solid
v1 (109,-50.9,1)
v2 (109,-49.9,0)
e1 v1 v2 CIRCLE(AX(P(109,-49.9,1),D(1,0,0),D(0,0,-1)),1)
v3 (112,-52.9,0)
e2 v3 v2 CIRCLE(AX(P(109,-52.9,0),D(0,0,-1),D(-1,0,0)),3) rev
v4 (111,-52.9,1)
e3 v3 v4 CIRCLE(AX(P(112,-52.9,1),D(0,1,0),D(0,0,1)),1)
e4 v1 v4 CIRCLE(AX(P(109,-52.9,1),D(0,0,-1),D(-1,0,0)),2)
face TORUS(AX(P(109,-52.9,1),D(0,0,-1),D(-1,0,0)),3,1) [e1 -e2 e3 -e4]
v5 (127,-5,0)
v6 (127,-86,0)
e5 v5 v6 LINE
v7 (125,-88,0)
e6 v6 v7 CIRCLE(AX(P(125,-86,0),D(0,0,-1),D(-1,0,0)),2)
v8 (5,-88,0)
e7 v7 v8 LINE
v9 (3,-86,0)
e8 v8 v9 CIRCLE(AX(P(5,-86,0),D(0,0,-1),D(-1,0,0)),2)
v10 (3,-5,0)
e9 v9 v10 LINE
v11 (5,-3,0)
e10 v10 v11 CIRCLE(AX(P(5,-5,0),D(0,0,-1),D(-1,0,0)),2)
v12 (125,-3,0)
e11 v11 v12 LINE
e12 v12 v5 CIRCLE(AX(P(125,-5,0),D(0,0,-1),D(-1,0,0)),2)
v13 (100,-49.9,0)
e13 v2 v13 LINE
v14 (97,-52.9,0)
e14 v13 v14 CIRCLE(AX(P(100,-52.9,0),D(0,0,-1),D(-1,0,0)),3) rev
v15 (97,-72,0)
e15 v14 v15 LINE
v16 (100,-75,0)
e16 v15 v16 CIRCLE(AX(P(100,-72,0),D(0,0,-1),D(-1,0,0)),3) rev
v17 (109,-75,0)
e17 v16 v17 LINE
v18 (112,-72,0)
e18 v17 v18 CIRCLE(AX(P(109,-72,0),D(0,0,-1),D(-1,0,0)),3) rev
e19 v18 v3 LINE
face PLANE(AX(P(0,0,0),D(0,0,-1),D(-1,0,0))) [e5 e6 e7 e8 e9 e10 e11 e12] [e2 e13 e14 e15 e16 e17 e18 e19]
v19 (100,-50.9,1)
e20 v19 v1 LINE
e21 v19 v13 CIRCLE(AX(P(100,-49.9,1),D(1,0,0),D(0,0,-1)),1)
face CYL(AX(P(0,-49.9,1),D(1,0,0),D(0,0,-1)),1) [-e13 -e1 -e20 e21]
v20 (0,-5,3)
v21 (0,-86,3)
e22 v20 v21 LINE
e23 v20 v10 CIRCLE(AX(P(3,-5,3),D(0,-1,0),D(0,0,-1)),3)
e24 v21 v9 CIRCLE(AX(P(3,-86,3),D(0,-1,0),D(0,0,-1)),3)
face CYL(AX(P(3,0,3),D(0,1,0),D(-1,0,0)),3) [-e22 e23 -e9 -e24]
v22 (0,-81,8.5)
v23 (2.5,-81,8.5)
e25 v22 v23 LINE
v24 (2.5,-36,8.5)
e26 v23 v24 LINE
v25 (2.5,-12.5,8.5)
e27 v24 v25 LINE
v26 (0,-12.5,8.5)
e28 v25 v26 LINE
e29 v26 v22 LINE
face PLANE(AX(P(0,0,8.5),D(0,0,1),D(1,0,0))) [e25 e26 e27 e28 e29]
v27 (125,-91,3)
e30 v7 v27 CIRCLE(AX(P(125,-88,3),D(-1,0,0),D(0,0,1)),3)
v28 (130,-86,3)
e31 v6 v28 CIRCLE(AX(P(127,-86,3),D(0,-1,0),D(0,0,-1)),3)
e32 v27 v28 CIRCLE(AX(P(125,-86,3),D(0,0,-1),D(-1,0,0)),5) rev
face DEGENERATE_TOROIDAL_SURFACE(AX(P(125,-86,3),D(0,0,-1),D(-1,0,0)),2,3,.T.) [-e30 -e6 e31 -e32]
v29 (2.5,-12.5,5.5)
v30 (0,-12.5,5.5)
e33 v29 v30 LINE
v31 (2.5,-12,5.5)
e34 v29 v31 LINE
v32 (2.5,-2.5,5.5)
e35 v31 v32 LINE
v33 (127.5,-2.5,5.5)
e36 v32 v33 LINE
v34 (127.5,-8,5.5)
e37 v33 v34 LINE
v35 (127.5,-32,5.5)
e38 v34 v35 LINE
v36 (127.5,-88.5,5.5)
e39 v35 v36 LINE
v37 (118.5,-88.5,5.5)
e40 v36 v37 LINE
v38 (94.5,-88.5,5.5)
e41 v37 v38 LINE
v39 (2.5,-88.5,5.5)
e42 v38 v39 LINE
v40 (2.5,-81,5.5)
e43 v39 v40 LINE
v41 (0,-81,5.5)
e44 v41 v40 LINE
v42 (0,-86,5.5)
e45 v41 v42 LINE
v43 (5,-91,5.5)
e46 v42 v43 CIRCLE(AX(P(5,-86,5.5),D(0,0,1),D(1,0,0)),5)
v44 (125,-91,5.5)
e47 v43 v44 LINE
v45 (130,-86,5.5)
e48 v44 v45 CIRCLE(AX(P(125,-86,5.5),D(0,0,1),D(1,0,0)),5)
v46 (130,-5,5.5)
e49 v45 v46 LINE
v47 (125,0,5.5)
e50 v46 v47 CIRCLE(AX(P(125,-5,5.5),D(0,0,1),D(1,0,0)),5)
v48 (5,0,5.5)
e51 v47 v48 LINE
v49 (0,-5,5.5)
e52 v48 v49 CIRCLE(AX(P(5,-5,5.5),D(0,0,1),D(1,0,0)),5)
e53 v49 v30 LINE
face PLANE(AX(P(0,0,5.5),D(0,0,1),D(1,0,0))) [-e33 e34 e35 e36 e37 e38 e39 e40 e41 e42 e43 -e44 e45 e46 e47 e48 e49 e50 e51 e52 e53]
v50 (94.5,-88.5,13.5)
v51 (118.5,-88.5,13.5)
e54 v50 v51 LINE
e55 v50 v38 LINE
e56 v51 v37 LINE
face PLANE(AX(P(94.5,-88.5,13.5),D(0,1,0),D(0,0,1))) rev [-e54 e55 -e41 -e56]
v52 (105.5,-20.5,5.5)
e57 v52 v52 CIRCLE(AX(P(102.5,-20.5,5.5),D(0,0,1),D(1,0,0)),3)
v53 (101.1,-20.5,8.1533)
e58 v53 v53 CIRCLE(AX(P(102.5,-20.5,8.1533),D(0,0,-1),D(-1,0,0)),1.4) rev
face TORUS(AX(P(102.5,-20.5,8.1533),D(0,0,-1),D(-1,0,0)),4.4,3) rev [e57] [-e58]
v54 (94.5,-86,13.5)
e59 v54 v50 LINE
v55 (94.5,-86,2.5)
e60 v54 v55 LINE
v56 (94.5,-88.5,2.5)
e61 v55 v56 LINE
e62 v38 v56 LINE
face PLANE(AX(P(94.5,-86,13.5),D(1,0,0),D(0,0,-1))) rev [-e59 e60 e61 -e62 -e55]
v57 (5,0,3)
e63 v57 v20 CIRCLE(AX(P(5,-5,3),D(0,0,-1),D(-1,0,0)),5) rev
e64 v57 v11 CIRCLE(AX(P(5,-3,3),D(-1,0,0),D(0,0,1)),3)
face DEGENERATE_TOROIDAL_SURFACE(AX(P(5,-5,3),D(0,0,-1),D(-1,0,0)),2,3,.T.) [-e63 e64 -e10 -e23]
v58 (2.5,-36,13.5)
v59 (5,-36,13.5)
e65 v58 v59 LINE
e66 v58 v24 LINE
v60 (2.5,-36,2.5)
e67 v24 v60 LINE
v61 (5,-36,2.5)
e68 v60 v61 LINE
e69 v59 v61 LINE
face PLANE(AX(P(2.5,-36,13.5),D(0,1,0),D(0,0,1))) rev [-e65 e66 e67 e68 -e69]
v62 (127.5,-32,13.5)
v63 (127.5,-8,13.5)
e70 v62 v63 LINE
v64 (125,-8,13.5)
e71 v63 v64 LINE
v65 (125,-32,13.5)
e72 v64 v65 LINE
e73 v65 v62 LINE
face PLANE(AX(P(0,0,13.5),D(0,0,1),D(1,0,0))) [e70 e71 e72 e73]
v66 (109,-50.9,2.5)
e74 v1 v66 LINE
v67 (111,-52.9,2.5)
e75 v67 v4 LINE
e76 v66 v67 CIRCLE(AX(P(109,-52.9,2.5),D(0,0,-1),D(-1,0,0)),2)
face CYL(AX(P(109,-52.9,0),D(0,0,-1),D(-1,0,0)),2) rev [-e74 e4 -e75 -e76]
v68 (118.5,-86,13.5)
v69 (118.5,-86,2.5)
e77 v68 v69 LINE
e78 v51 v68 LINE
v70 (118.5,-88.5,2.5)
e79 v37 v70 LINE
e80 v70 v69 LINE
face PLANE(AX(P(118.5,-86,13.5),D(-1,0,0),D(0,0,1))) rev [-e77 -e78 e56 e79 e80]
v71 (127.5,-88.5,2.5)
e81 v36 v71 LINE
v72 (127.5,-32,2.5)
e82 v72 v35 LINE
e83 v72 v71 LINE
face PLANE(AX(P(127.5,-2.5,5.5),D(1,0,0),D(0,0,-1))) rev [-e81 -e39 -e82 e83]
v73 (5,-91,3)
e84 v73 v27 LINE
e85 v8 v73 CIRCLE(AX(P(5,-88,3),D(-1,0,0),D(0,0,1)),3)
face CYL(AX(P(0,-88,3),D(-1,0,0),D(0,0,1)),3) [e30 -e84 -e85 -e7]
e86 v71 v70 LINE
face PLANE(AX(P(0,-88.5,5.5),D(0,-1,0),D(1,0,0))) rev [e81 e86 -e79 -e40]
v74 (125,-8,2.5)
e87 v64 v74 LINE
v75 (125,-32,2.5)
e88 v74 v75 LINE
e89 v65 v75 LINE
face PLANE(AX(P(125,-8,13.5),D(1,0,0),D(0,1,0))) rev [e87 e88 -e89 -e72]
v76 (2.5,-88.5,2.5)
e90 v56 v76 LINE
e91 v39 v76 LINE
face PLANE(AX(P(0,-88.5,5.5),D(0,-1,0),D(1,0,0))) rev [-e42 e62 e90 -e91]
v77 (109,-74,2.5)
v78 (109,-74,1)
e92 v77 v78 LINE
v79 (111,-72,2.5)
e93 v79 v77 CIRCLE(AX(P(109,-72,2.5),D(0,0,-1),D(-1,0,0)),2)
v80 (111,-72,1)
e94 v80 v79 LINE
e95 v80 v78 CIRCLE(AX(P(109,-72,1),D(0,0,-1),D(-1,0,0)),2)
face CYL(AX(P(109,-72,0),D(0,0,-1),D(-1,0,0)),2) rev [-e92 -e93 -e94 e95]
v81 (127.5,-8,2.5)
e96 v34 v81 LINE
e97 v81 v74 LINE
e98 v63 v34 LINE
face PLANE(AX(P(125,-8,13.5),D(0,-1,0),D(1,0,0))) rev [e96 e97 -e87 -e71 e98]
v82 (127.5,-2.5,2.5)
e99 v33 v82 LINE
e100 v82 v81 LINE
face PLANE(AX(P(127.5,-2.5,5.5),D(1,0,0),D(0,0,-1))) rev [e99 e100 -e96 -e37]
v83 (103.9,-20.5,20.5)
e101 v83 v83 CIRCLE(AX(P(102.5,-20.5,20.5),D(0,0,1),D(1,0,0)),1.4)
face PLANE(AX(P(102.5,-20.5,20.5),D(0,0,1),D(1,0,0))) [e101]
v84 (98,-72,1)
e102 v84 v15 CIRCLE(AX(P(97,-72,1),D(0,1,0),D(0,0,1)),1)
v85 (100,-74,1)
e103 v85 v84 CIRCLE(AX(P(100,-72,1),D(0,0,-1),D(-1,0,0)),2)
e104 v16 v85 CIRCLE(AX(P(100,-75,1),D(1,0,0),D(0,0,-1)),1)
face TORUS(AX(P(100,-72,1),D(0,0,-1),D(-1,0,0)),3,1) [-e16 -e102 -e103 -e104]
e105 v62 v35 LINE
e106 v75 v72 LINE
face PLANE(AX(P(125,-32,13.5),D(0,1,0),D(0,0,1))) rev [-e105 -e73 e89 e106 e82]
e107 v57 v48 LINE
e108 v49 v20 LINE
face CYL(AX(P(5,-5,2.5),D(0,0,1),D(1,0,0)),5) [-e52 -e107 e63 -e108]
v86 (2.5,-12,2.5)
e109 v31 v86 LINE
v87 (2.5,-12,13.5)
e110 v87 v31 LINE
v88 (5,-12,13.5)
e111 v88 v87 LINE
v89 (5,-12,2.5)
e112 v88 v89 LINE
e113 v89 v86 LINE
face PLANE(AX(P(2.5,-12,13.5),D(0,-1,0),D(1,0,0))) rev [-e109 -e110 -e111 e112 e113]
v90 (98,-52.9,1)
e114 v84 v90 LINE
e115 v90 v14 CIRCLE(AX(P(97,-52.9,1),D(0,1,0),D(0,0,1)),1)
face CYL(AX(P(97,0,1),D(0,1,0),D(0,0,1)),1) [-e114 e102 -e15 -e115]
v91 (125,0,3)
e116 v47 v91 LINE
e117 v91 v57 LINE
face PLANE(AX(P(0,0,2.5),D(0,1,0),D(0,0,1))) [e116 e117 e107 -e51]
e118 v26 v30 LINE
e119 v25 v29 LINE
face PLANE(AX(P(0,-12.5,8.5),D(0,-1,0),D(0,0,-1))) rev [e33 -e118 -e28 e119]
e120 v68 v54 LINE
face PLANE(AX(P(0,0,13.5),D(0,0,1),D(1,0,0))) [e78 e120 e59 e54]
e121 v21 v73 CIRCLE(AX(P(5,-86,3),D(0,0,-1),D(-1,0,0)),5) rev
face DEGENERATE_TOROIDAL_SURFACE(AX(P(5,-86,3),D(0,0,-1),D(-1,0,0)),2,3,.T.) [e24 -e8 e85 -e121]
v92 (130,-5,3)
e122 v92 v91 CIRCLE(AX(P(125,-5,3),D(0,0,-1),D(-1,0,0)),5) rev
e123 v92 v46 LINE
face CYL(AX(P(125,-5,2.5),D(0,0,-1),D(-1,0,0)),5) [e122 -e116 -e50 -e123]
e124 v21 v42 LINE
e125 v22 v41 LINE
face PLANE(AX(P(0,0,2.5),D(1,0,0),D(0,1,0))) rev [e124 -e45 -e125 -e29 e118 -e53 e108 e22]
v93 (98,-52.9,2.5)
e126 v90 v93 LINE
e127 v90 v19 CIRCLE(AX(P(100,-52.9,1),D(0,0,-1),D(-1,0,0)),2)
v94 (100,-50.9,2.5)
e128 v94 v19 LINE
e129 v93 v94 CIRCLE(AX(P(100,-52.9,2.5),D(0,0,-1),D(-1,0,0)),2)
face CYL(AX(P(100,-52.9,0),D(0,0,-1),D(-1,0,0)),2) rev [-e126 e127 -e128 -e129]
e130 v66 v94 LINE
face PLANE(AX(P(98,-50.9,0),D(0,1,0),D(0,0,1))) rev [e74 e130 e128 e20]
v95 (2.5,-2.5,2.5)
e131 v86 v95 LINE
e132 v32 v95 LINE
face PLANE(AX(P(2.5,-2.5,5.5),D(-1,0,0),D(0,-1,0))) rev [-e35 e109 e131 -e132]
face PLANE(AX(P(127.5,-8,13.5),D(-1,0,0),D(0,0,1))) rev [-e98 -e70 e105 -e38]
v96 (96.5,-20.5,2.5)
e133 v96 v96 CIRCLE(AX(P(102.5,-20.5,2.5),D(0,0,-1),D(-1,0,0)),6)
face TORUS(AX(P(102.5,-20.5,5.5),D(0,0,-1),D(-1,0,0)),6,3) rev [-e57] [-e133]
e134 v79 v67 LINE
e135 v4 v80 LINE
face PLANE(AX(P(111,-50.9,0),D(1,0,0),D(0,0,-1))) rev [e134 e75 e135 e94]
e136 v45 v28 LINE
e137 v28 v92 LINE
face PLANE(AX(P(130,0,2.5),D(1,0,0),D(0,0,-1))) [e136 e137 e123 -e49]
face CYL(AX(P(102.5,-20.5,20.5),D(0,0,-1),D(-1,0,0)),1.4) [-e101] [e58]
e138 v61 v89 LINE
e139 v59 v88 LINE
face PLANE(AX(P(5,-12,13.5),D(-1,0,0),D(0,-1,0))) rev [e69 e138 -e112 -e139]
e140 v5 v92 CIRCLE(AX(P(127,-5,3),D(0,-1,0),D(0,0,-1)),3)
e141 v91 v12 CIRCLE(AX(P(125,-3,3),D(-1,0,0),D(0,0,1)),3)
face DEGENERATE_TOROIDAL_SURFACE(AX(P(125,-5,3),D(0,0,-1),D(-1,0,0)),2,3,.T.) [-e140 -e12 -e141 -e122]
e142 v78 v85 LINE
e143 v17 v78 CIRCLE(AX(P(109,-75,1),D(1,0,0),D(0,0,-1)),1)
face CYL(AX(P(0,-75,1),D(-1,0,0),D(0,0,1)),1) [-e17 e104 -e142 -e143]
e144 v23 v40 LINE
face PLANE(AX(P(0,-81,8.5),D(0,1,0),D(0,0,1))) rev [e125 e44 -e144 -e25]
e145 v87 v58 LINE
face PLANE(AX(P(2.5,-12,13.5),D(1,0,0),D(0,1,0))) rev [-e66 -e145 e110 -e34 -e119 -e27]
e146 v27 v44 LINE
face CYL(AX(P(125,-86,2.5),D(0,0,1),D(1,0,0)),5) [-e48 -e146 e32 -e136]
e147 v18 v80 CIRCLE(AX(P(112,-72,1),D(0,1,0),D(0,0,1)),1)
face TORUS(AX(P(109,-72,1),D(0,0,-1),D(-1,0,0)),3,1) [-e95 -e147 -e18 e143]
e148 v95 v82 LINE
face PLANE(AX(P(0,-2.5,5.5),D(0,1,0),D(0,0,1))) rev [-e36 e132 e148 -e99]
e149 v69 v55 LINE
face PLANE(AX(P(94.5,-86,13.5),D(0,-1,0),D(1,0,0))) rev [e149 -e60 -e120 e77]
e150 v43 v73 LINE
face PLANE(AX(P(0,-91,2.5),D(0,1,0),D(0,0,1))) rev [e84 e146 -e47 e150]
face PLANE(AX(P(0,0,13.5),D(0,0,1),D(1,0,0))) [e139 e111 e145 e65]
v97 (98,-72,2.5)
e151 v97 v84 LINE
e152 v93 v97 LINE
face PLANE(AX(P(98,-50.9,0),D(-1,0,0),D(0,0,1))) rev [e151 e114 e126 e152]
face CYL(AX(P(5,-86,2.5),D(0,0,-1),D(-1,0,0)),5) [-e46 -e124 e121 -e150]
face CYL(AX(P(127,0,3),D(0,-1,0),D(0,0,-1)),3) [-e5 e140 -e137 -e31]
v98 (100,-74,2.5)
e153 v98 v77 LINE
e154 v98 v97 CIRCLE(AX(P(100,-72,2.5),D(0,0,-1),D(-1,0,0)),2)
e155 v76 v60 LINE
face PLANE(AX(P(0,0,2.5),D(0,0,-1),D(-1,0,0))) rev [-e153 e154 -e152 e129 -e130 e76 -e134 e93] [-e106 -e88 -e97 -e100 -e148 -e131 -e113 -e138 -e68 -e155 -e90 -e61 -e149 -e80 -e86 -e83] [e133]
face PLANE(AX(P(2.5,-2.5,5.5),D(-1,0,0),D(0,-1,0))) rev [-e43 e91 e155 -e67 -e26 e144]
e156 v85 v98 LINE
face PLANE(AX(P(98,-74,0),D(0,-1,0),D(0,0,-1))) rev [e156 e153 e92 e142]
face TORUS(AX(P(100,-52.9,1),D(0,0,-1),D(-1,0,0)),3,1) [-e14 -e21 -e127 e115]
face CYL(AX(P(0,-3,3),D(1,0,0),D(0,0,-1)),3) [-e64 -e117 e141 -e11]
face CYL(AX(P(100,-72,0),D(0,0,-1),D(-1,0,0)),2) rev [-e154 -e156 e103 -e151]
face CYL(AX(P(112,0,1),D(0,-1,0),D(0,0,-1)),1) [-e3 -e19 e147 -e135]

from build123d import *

# Parameters (mm, degrees)
SKETCH1_W            = 130
SKETCH1_H            = 91
BOSS_EXTRUDE1_DEPTH  = 2.5
SKETCH3_W            = 130
SKETCH3_H            = 2.5
BOSS_EXTRUDE2_DEPTH  = 3
SKETCH2_W            = 130
SKETCH2_H            = 2.5
BOSS_EXTRUDE3_DEPTH  = 3
SKETCH4_W            = 2.5
SKETCH4_H            = 86
BOSS_EXTRUDE4_DEPTH  = 3
SKETCH5_W            = 2.5
SKETCH5_H            = 86
BOSS_EXTRUDE5_DEPTH  = 3
FILLET2_R            = 5
FILLET3_R            = 5
FILLET4_R            = 5
FILLET5_R            = 5
SKETCH7_W            = 2.5
SKETCH7_H            = 68.5
BOSS_EXTRUDE6_DEPTH  = 3
SKETCH8_W            = 24
SKETCH8_H            = 2.5
BOSS_EXTRUDE7_DEPTH  = 11
SKETCH9_W            = 2.5
SKETCH9_H            = 24
BOSS_EXTRUDE8_DEPTH  = 11
SKETCH10_W           = 2.5
SKETCH10_H           = 24
BOSS_EXTRUDE9_DEPTH  = 11
SKETCH11_R           = 3
BOSS_EXTRUDE10_DEPTH = 3
SKETCH12_R           = 1.4
BOSS_EXTRUDE11_DEPTH = 15
SKETCH13_W           = 13
SKETCH13_H           = 23.1
CUT_EXTRUDE1_DEPTH   = 160.702849067
FILLET17_R           = 2
FILLET18_R           = 2
FILLET19_R           = 2
FILLET20_R           = 2
FILLET23_R           = 1
FILLET24_R           = 3
FILLET25_R           = 3
FILLET26_R           = 3


# Some blends are built 0.0001 mm under size
with BuildPart() as part:
    # Sketch1 → Boss-Extrude1 (new body)
    with BuildSketch(Plane.XY):
        with Locations((65, -45.5)):
            Rectangle(SKETCH1_W, SKETCH1_H)
    extrude(amount=BOSS_EXTRUDE1_DEPTH)

    # Sketch3 → Boss-Extrude2 (add)
    with BuildSketch(Plane.XY.offset(2.5)):
        with Locations((65, -89.75)):
            Rectangle(SKETCH3_W, SKETCH3_H)
    extrude(amount=BOSS_EXTRUDE2_DEPTH)

    # Sketch2 → Boss-Extrude3 (add)
    with BuildSketch(Plane.XY.offset(2.5)):
        with Locations((65, -1.25)):
            Rectangle(SKETCH2_W, SKETCH2_H)
    extrude(amount=BOSS_EXTRUDE3_DEPTH)

    # Sketch4 → Boss-Extrude4 (add)
    with BuildSketch(Plane.XY.offset(2.5)):
        with Locations((128.75, -45.5)):
            Rectangle(SKETCH4_W, SKETCH4_H)
    extrude(amount=BOSS_EXTRUDE4_DEPTH)

    # Sketch5 → Boss-Extrude5 (add)
    with BuildSketch(Plane.XY.offset(2.5)):
        with Locations((1.25, -45.5)):
            Rectangle(SKETCH5_W, SKETCH5_H)
    extrude(amount=BOSS_EXTRUDE5_DEPTH)

    # Fillet2
    fillet2_edges = [part.edges().sort_by_distance(p)[0] for p in [
        (130, -91, 2.75),
    ]]
    fillet(fillet2_edges, radius=FILLET2_R)

    # Fillet3
    fillet3_edges = [part.edges().sort_by_distance(p)[0] for p in [
        (130, 0, 2.75),
    ]]
    fillet(fillet3_edges, radius=FILLET3_R)

    # Fillet4
    fillet4_edges = [part.edges().sort_by_distance(p)[0] for p in [
        (0, 0, 2.75),
    ]]
    fillet(fillet4_edges, radius=FILLET4_R)

    # Fillet5
    fillet5_edges = [part.edges().sort_by_distance(p)[0] for p in [
        (0, -91, 2.75),
    ]]
    fillet(fillet5_edges, radius=FILLET5_R)

    # Sketch7 → Boss-Extrude6 (add)
    with BuildSketch(Plane.XY.offset(5.5)):
        with Locations((1.25, -46.75)):
            Rectangle(SKETCH7_W, SKETCH7_H)
    extrude(amount=BOSS_EXTRUDE6_DEPTH)

    # Sketch8 → Boss-Extrude7 (add)
    with BuildSketch(Plane.XY.offset(2.5)):
        with Locations((106.5, -87.25)):
            Rectangle(SKETCH8_W, SKETCH8_H)
    extrude(amount=BOSS_EXTRUDE7_DEPTH)

    # Sketch9 → Boss-Extrude8 (add)
    with BuildSketch(Plane.XY.offset(2.5)):
        with Locations((126.25, -20)):
            Rectangle(SKETCH9_W, SKETCH9_H)
    extrude(amount=BOSS_EXTRUDE8_DEPTH)

    # Sketch10 → Boss-Extrude9 (add)
    with BuildSketch(Plane.XY.offset(2.5)):
        with Locations((3.75, -24)):
            Rectangle(SKETCH10_W, SKETCH10_H)
    extrude(amount=BOSS_EXTRUDE9_DEPTH)

    # Sketch11 → Boss-Extrude10 (add)
    with BuildSketch(Plane.XY.offset(2.5)):
        with Locations(Location((102.5, -20.5, 0), (0, 0, 180))):
            Circle(SKETCH11_R)
    extrude(amount=BOSS_EXTRUDE10_DEPTH)

    # Sketch12 → Boss-Extrude11 (add)
    with BuildSketch(Plane.XY.offset(5.5)):
        with Locations((102.5, -20.5)):
            Circle(SKETCH12_R)
    extrude(amount=BOSS_EXTRUDE11_DEPTH)

    # Sketch13 → Cut-Extrude1 (cut, through all)
    with BuildSketch(Plane.XY.offset(2.5)):
        with Locations((104.5, -62.45)):
            Rectangle(SKETCH13_W, SKETCH13_H)
    extrude(amount=-CUT_EXTRUDE1_DEPTH, mode=Mode.SUBTRACT)

    # Fillet17
    fillet17_edges = [part.edges().sort_by_distance(p)[0] for p in [
        (98, -74, 1.25),
    ]]
    fillet(fillet17_edges, radius=FILLET17_R)

    # Fillet18
    fillet18_edges = [part.edges().sort_by_distance(p)[0] for p in [
        (98, -50.9, 1.25),
    ]]
    fillet(fillet18_edges, radius=FILLET18_R)

    # Fillet19
    fillet19_edges = [part.edges().sort_by_distance(p)[0] for p in [
        (111, -50.9, 1.25),
    ]]
    fillet(fillet19_edges, radius=FILLET19_R)

    # Fillet20
    fillet20_edges = [part.edges().sort_by_distance(p)[0] for p in [
        (111, -74, 1.25),
    ]]
    fillet(fillet20_edges, radius=FILLET20_R)

    # Fillet23
    fillet23_edges = [part.edges().sort_by_distance(p)[0] for p in [
        (104.5, -74, 0),
        (98.585786438, -73.414213562, 0),
        (98, -62.45, 0),
        (98.585786438, -51.485786438, 0),
        (104.5, -50.9, 0),
        (110.414213562, -51.485786438, 0),
        (111, -62.45, 0),
        (110.414213562, -73.414213562, 0),
    ]]
    fillet(fillet23_edges, radius=FILLET23_R)

    # Fillet24
    fillet24_edges = [part.edges().sort_by_distance(p)[0] for p in [
        (128.535533906, -89.535533906, 0),
        (130, -45.5, 0),
        (128.535533906, -1.464466094, 0),
        (0, -45.5, 0),
        (65, 0, 0),
        (1.464466094, -1.464466094, 0),
        (65, -91, 0),
        (1.464466094, -89.535533906, 0),
    ]]
    fillet(fillet24_edges, radius=FILLET24_R)

    # Fillet25
    # the kernel refuses this fillet: 3 mm, written as the material it adds along each edge
    with BuildSketch(Plane(origin=(102.5, -20.5, 5.5), x_dir=(1, 0, 0), z_dir=(0, -1, 0))) as fillet25_piece_1:
        with BuildLine():
            CenterArc((4.4, 2.653299832), FILLET25_R, 180, 62.181860715)
            Line((1.4, 2.653299832), (1.34, 2.653299832))
            Line((1.34, 2.653299832), (1.34, 0))
            Line((1.34, 0), (1.4, -0.06))
            ThreePointArc((1.4, -0.06), (2.2, -0.06), (2.972, -0.053065997))
            Line((2.972, -0.053065997), (3, 0))
        make_face()
    revolve(axis=Axis((102.5, -20.5, 5.5), (0, 0, 1)))

    # Fillet26
    fillet26_edges = [part.edges().sort_by_distance(p)[0] for p in [
        (105.5, -20.5, 2.5),
    ]]
    fillet(fillet26_edges, radius=FILLET26_R - 0.0001)  # a hair under: the kernel refuses the full size


solid = part.part
